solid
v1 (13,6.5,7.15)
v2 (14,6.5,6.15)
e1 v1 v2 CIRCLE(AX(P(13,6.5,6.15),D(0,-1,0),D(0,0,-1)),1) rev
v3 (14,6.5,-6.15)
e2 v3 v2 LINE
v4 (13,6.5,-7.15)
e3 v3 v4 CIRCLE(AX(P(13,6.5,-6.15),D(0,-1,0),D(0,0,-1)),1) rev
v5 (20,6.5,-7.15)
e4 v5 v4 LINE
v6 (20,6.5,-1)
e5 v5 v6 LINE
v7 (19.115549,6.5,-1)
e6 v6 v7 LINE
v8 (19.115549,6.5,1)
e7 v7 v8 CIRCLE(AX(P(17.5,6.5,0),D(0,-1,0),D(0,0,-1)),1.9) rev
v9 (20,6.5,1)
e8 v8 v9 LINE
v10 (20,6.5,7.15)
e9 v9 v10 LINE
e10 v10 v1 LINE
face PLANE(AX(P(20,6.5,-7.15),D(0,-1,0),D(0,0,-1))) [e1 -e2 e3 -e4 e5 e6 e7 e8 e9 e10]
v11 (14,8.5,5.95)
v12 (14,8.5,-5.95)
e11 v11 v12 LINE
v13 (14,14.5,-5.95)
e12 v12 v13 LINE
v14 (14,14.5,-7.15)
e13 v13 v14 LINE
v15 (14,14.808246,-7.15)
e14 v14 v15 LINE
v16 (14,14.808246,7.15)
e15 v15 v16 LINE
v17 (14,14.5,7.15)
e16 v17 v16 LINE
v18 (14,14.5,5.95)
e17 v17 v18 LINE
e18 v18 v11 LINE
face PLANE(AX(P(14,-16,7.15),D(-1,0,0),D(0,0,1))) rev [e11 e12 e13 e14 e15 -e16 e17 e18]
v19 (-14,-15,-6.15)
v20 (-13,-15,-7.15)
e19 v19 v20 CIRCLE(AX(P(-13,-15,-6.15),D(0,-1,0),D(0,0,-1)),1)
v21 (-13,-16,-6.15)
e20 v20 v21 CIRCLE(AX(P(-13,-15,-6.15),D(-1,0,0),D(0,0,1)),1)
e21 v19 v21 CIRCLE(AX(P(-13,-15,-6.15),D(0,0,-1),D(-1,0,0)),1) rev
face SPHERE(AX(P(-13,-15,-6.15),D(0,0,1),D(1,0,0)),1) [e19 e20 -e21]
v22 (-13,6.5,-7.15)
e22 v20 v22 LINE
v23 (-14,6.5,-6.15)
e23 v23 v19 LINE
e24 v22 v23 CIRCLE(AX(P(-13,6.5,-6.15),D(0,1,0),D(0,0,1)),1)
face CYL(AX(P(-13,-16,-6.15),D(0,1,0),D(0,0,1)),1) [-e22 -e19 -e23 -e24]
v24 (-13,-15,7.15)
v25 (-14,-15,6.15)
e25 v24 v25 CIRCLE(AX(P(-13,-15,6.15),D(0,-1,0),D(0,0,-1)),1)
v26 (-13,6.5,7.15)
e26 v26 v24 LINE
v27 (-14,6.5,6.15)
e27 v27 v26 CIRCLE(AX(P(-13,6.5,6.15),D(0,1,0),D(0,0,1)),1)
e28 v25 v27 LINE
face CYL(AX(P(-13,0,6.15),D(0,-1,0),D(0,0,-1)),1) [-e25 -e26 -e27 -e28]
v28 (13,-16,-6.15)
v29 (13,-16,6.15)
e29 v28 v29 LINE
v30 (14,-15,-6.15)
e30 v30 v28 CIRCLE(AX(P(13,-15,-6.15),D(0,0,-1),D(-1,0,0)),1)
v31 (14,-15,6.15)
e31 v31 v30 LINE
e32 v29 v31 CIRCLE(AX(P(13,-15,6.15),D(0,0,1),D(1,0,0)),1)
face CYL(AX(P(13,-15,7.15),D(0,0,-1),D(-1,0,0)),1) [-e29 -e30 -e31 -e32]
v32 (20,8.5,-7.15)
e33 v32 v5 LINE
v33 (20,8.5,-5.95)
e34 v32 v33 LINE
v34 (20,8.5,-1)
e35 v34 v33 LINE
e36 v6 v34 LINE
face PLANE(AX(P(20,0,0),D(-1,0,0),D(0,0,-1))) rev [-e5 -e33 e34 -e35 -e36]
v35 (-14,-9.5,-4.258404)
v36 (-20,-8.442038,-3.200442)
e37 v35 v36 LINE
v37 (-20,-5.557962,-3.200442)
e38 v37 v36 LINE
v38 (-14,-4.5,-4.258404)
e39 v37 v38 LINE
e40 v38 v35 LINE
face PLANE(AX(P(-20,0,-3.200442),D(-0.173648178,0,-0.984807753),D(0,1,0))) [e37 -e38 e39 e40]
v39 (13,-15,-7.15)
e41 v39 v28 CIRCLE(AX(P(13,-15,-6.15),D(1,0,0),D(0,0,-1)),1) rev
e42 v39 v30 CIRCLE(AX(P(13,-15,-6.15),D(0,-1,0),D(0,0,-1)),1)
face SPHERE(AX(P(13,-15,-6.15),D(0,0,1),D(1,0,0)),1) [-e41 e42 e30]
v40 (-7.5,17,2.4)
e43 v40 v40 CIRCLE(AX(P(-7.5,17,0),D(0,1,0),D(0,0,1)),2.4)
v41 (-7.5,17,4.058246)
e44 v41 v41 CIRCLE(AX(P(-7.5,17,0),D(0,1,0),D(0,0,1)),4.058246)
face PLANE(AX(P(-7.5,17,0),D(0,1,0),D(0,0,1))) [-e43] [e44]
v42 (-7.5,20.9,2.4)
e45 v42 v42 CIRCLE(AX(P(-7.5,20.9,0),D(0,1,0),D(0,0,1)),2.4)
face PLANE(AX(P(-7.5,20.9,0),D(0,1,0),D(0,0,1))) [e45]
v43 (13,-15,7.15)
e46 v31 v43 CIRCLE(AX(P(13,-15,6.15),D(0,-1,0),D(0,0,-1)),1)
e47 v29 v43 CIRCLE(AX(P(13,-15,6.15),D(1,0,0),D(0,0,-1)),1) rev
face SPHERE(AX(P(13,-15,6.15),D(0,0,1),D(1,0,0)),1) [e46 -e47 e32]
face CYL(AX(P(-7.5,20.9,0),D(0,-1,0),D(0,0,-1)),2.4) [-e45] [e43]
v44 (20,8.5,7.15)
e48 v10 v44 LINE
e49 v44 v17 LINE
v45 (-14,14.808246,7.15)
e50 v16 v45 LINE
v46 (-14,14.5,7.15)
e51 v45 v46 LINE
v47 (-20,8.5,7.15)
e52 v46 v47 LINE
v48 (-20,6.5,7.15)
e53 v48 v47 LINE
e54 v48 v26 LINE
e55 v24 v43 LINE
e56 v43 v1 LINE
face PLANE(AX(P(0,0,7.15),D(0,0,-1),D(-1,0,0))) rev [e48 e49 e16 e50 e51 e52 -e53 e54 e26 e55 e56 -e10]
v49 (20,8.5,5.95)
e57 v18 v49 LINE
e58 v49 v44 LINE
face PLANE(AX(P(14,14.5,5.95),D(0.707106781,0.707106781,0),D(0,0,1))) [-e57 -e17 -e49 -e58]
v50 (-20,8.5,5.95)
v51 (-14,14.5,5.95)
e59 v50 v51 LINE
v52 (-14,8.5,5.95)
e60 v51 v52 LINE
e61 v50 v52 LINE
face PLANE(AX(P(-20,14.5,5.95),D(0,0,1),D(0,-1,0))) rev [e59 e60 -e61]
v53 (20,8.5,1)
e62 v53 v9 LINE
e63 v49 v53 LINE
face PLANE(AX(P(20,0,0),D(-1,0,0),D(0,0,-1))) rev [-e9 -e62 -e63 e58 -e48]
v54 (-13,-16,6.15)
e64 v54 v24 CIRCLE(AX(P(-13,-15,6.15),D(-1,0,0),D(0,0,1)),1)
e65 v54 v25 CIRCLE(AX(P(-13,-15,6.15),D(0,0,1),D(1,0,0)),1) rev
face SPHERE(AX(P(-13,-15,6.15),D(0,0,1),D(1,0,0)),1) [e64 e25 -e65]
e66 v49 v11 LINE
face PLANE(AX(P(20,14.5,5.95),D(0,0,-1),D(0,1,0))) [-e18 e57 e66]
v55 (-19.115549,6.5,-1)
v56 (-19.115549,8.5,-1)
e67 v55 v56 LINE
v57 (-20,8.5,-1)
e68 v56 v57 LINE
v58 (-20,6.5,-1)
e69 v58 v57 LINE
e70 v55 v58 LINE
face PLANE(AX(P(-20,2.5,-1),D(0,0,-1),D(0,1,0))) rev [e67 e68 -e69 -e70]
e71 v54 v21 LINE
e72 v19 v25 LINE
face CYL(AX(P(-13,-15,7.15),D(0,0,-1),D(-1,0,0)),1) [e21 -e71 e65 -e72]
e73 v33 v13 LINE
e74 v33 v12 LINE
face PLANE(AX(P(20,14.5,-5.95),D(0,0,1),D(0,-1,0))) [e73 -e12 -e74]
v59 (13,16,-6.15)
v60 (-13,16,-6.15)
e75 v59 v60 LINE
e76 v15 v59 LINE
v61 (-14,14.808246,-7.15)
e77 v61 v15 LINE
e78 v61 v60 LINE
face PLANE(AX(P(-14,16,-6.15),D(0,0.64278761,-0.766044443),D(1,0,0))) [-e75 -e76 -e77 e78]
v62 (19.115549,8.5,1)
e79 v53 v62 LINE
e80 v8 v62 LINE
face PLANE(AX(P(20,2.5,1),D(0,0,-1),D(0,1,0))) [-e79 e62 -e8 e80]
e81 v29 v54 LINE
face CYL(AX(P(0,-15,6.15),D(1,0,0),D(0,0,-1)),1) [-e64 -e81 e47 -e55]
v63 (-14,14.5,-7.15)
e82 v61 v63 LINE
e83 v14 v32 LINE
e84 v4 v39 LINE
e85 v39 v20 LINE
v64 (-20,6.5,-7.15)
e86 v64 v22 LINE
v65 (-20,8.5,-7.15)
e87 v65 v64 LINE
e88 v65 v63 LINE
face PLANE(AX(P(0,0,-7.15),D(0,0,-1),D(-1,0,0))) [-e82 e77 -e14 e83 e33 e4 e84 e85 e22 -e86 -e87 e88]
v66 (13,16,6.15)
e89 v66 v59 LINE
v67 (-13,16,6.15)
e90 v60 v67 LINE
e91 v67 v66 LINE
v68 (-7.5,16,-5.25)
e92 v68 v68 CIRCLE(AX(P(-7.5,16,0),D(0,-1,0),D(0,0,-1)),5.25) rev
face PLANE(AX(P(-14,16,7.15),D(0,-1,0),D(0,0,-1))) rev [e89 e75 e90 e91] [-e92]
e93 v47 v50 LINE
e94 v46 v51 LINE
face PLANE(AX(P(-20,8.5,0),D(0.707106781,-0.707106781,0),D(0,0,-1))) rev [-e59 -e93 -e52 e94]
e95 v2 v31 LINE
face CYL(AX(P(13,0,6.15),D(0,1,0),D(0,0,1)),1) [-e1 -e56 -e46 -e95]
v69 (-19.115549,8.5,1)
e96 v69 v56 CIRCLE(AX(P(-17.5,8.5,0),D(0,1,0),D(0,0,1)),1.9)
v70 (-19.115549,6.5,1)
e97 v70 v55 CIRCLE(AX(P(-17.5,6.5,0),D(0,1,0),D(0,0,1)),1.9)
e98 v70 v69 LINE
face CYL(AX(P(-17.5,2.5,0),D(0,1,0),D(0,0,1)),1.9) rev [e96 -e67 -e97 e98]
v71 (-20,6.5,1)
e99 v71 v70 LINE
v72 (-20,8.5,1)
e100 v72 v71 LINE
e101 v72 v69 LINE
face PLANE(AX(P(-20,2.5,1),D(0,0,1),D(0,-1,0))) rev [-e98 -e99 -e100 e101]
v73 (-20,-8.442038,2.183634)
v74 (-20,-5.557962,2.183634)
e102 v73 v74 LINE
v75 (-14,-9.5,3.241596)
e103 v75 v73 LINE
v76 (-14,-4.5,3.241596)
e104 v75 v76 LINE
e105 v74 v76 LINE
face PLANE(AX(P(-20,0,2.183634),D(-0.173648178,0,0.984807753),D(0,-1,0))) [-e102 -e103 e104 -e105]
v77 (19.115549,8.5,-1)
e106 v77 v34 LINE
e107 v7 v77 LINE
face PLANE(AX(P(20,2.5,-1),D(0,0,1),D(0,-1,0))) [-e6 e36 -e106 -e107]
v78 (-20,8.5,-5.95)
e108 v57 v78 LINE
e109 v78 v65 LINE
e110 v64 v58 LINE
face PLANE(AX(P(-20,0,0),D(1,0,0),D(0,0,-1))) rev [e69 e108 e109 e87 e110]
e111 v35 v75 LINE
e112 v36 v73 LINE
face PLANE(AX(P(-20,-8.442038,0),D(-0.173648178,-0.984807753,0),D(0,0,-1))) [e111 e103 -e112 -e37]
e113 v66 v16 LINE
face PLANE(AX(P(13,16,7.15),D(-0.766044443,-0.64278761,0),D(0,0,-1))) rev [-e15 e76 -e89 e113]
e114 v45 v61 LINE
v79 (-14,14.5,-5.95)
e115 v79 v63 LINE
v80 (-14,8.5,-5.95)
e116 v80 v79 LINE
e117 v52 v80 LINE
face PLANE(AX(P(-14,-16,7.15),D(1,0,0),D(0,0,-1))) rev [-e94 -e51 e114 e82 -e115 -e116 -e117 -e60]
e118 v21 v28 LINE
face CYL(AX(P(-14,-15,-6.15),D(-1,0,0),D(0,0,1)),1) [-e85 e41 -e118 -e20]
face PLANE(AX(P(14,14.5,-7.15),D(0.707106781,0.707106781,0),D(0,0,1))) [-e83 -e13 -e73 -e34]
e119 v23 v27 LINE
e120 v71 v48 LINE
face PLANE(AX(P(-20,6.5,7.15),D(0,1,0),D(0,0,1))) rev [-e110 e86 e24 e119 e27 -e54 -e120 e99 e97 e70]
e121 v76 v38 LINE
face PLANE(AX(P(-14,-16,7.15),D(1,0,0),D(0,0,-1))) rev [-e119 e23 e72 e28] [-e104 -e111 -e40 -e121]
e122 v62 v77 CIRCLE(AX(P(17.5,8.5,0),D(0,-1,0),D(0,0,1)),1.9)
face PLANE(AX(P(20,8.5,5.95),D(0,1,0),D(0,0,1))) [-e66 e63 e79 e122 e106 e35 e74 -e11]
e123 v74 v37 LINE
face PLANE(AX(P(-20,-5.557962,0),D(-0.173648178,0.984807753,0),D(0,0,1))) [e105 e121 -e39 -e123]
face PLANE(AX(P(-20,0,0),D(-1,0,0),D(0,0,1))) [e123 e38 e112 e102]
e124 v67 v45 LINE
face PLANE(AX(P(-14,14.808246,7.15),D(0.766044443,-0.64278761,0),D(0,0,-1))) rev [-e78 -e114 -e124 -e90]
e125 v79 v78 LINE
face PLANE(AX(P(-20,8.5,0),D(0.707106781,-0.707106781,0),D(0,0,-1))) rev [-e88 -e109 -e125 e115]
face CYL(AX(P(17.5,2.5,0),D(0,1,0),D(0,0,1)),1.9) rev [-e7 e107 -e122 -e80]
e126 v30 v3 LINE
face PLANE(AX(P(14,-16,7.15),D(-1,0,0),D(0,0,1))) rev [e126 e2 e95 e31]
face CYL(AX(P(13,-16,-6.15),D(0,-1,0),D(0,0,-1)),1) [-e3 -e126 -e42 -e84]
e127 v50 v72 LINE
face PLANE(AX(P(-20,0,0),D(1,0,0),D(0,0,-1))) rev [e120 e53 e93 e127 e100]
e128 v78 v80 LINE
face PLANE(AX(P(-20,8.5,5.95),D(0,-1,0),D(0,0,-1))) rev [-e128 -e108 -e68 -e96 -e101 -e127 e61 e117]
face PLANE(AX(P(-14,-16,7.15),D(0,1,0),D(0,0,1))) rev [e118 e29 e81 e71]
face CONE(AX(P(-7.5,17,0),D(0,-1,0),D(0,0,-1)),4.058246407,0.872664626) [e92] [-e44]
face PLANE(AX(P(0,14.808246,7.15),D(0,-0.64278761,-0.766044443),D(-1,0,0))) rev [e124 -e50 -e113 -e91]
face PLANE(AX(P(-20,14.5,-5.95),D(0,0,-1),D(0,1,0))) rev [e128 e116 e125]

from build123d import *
from OCP.BRepFilletAPI import BRepFilletAPI_MakeChamfer

# Parameters (mm, degrees)
ESQUISSE1_W                  = 28
ESQUISSE1_H                  = 32
BOSS_EXTRU_1_DEPTH           = 7.15
BOSS_EXTRU_2_DEPTH           = 6
CHANFREIN1_SIZE              = 6
ENL_V_MAT_EXTRU_1_DEPTH      = 6
CHANFREIN1_OF_SYM_TRIE1_SIZE = 6
CONG_1_R                     = 1
ESQUISSE4_R                  = 5.25
BOSS_EXTRU_3_DEPTH           = 1
CHANFREIN2_SIZE2             = 1.191753593
CHANFREIN2_SIZE              = 1
ESQUISSE5_R                  = 2.4
BOSS_EXTRU_4_DEPTH           = 3.9
CHANFREIN3_SIZE              = 1
CHANFREIN3_SIZE2             = 1.191753593
ESQUISSE6_W                  = 7.5
ESQUISSE6_H                  = 5
BOSS_EXTRU_5_DEPTH           = 6
CHANFREIN4_SIZE              = 6
CHANFREIN4_SIZE_2            = 1.057961884


with BuildPart() as part:
    # Esquisse1 → Boss.-Extru.1 (new, symmetric)
    with BuildSketch(Plane.XY):
        Rectangle(ESQUISSE1_W, ESQUISSE1_H)
    extrude(amount=BOSS_EXTRU_1_DEPTH, both=True)

    # Esquisse2 → Boss.-Extru.2 (add)
    with BuildSketch(Plane.ZY.offset(14)):
        Polygon((5.95, 14.5), (7.15, 14.5), (7.15, 6.5), (5.366521974, 6.5), (-5.315928015, 6.5), (-7.15, 6.5), (-7.15, 14.5), (-5.95, 14.5), (-5.95, 8.5), (5.95, 8.5), align=None)
    boss_extru_2 = extrude(amount=BOSS_EXTRU_2_DEPTH)

    # Chanfrein1
    chanfrein1_edges = [part.edges().sort_by_distance(p)[0] for p in [
        (-20, 14.5, 6.55),
        (-20, 14.5, -6.55),
    ]]
    chamfer(chanfrein1_edges, length=CHANFREIN1_SIZE - 0.0001)  # a hair under: the kernel refuses the full size

    # Esquisse3 → Enlèv. mat.-Extru.1 (cut)
    with BuildSketch(Plane(origin=(0, 8.5, 0), x_dir=(1, 0, 0), z_dir=(0, 1, 0))):
        with BuildLine():
            Line((-20, 1), (-19.115549442, 1))
            ThreePointArc((-19.115549442, 1), (-15.6, 0), (-19.115549442, -1))
            Line((-19.115549442, -1), (-20, -1))
            Line((-20, -1), (-20, 1))
        make_face()
    enl_v_mat_extru_1 = extrude(amount=-ENL_V_MAT_EXTRU_1_DEPTH, mode=Mode.SUBTRACT)

    # Symétrie1: Boss.-Extru.2, Enlèv. mat.-Extru.1 across plane
    add(boss_extru_2.mirror(Plane(origin=(0, 0, 0), x_dir=(0, 0, 1), z_dir=(1, 0, 0))))
    add(enl_v_mat_extru_1.mirror(Plane(origin=(0, 0, 0), x_dir=(0, 0, 1), z_dir=(1, 0, 0))), mode=Mode.SUBTRACT)

    # Chanfrein1 of Symétrie1
    chanfrein1_of_sym_trie1_edges = [part.edges().sort_by_distance(p)[0] for p in [
        (20, 14.5, 6.55),
        (20, 14.5, -6.55),
    ]]
    chamfer(chanfrein1_of_sym_trie1_edges, length=CHANFREIN1_OF_SYM_TRIE1_SIZE - 0.0001)  # a hair under: the kernel refuses the full size

    # Congé1
    cong_1_edges = [part.edges().sort_by_distance(p)[0] for p in [
        (-14, -16, 0),
        (-14, -4.75, -7.15),
        (-14, -4.75, 7.15),
        (14, -4.75, -7.15),
        (14, -4.75, 7.15),
        (0, -16, -7.15),
        (0, -16, 7.15),
        (14, -16, 0),
    ]]
    fillet(cong_1_edges, radius=CONG_1_R)

    # Esquisse4 → Boss.-Extru.3 (add)
    with BuildSketch(Plane(origin=(0, 16, 0), x_dir=(1, 0, 0), z_dir=(0, 1, 0))):
        with Locations(Location((-7.5, 0, 0), (0, 0, 90))):
            Circle(ESQUISSE4_R)
    extrude(amount=BOSS_EXTRU_3_DEPTH)

    # Chanfrein2
    chanfrein2_edges = [part.edges().sort_by_distance(p)[0] for p in [
        (-7.5, 17, 5.25),
    ]]
    chanfrein2_side = [part.faces().sort_by_distance(p)[0] for p in [
        (-7.5, 16.98, 5.25),
    ]]
    chamfer(chanfrein2_edges, length=CHANFREIN2_SIZE - 0.0001, length2=CHANFREIN2_SIZE2 - 0.0001, reference=chanfrein2_side[0])  # a hair under: the kernel refuses the full size

    # Esquisse5 → Boss.-Extru.4 (add)
    with BuildSketch(Plane(origin=(0, 17, 0), x_dir=(1, 0, 0), z_dir=(0, 1, 0))):
        with Locations(Location((-7.5, 0, 0), (0, 0, 270))):
            Circle(ESQUISSE5_R)
    extrude(amount=BOSS_EXTRU_4_DEPTH)

    # Chanfrein3
    chanfrein3_edges = [part.edges().sort_by_distance(p)[0] for p in [
        (14, 16, 0),
        (0, 16, -7.15),
        (0, 16, 7.15),
        (-14, 16, 0),
    ]]
    chanfrein3_side = [part.faces().sort_by_distance(p)[0] for p in [
        (2.069489218, 16, 0),
    ]]
    chamfer(chanfrein3_edges, length=CHANFREIN3_SIZE, length2=CHANFREIN3_SIZE2, reference=chanfrein3_side[0])

    # Esquisse6 → Boss.-Extru.5 (add)
    with BuildSketch(Plane.ZY.offset(14)):
        with Locations((-0.508404359, -7)):
            Rectangle(ESQUISSE6_W, ESQUISSE6_H)
    extrude(amount=BOSS_EXTRU_5_DEPTH)

    # Chanfrein4
    chanfrein4_edges_1 = [part.edges().sort_by_distance(p)[0] for p in [
        (-20, -7, -4.258404359),
    ]]
    chanfrein4_side_1 = [part.faces().sort_by_distance(p)[0] for p in [
        (-19.978840762, -7, -4.258404359),
    ]]
    chanfrein4_edges_2 = [part.edges().sort_by_distance(p)[0] for p in [
        (-20, -9.5, -0.508404359),
    ]]
    chanfrein4_side_2 = [part.faces().sort_by_distance(p)[0] for p in [
        (-19.978840762, -9.5, -0.508404359),
    ]]
    chanfrein4_edges_3 = [part.edges().sort_by_distance(p)[0] for p in [
        (-20, -7, 3.241595641),
    ]]
    chanfrein4_side_3 = [part.faces().sort_by_distance(p)[0] for p in [
        (-19.978840762, -7, 3.241595641),
    ]]
    chanfrein4_edges_4 = [part.edges().sort_by_distance(p)[0] for p in [
        (-20, -4.5, -0.508404359),
    ]]
    chanfrein4_side_4 = [part.faces().sort_by_distance(p)[0] for p in [
        (-19.978840762, -4.5, -0.508404359),
    ]]
    chanfrein4 = BRepFilletAPI_MakeChamfer(part.part.solid().wrapped)
    for e in chanfrein4_edges_1:
        chanfrein4.Add(CHANFREIN4_SIZE - 0.0001, CHANFREIN4_SIZE_2 - 0.0001, e.wrapped, chanfrein4_side_1[0].wrapped)
    for e in chanfrein4_edges_2:
        chanfrein4.Add(CHANFREIN4_SIZE - 0.0001, CHANFREIN4_SIZE_2 - 0.0001, e.wrapped, chanfrein4_side_2[0].wrapped)
    for e in chanfrein4_edges_3:
        chanfrein4.Add(CHANFREIN4_SIZE - 0.0001, CHANFREIN4_SIZE_2 - 0.0001, e.wrapped, chanfrein4_side_3[0].wrapped)
    for e in chanfrein4_edges_4:
        chanfrein4.Add(CHANFREIN4_SIZE - 0.0001, CHANFREIN4_SIZE_2 - 0.0001, e.wrapped, chanfrein4_side_4[0].wrapped)
    add(Compound.cast(chanfrein4.Shape()), mode=Mode.REPLACE)  # a hair under: the kernel refuses the full size


solid = part.part
